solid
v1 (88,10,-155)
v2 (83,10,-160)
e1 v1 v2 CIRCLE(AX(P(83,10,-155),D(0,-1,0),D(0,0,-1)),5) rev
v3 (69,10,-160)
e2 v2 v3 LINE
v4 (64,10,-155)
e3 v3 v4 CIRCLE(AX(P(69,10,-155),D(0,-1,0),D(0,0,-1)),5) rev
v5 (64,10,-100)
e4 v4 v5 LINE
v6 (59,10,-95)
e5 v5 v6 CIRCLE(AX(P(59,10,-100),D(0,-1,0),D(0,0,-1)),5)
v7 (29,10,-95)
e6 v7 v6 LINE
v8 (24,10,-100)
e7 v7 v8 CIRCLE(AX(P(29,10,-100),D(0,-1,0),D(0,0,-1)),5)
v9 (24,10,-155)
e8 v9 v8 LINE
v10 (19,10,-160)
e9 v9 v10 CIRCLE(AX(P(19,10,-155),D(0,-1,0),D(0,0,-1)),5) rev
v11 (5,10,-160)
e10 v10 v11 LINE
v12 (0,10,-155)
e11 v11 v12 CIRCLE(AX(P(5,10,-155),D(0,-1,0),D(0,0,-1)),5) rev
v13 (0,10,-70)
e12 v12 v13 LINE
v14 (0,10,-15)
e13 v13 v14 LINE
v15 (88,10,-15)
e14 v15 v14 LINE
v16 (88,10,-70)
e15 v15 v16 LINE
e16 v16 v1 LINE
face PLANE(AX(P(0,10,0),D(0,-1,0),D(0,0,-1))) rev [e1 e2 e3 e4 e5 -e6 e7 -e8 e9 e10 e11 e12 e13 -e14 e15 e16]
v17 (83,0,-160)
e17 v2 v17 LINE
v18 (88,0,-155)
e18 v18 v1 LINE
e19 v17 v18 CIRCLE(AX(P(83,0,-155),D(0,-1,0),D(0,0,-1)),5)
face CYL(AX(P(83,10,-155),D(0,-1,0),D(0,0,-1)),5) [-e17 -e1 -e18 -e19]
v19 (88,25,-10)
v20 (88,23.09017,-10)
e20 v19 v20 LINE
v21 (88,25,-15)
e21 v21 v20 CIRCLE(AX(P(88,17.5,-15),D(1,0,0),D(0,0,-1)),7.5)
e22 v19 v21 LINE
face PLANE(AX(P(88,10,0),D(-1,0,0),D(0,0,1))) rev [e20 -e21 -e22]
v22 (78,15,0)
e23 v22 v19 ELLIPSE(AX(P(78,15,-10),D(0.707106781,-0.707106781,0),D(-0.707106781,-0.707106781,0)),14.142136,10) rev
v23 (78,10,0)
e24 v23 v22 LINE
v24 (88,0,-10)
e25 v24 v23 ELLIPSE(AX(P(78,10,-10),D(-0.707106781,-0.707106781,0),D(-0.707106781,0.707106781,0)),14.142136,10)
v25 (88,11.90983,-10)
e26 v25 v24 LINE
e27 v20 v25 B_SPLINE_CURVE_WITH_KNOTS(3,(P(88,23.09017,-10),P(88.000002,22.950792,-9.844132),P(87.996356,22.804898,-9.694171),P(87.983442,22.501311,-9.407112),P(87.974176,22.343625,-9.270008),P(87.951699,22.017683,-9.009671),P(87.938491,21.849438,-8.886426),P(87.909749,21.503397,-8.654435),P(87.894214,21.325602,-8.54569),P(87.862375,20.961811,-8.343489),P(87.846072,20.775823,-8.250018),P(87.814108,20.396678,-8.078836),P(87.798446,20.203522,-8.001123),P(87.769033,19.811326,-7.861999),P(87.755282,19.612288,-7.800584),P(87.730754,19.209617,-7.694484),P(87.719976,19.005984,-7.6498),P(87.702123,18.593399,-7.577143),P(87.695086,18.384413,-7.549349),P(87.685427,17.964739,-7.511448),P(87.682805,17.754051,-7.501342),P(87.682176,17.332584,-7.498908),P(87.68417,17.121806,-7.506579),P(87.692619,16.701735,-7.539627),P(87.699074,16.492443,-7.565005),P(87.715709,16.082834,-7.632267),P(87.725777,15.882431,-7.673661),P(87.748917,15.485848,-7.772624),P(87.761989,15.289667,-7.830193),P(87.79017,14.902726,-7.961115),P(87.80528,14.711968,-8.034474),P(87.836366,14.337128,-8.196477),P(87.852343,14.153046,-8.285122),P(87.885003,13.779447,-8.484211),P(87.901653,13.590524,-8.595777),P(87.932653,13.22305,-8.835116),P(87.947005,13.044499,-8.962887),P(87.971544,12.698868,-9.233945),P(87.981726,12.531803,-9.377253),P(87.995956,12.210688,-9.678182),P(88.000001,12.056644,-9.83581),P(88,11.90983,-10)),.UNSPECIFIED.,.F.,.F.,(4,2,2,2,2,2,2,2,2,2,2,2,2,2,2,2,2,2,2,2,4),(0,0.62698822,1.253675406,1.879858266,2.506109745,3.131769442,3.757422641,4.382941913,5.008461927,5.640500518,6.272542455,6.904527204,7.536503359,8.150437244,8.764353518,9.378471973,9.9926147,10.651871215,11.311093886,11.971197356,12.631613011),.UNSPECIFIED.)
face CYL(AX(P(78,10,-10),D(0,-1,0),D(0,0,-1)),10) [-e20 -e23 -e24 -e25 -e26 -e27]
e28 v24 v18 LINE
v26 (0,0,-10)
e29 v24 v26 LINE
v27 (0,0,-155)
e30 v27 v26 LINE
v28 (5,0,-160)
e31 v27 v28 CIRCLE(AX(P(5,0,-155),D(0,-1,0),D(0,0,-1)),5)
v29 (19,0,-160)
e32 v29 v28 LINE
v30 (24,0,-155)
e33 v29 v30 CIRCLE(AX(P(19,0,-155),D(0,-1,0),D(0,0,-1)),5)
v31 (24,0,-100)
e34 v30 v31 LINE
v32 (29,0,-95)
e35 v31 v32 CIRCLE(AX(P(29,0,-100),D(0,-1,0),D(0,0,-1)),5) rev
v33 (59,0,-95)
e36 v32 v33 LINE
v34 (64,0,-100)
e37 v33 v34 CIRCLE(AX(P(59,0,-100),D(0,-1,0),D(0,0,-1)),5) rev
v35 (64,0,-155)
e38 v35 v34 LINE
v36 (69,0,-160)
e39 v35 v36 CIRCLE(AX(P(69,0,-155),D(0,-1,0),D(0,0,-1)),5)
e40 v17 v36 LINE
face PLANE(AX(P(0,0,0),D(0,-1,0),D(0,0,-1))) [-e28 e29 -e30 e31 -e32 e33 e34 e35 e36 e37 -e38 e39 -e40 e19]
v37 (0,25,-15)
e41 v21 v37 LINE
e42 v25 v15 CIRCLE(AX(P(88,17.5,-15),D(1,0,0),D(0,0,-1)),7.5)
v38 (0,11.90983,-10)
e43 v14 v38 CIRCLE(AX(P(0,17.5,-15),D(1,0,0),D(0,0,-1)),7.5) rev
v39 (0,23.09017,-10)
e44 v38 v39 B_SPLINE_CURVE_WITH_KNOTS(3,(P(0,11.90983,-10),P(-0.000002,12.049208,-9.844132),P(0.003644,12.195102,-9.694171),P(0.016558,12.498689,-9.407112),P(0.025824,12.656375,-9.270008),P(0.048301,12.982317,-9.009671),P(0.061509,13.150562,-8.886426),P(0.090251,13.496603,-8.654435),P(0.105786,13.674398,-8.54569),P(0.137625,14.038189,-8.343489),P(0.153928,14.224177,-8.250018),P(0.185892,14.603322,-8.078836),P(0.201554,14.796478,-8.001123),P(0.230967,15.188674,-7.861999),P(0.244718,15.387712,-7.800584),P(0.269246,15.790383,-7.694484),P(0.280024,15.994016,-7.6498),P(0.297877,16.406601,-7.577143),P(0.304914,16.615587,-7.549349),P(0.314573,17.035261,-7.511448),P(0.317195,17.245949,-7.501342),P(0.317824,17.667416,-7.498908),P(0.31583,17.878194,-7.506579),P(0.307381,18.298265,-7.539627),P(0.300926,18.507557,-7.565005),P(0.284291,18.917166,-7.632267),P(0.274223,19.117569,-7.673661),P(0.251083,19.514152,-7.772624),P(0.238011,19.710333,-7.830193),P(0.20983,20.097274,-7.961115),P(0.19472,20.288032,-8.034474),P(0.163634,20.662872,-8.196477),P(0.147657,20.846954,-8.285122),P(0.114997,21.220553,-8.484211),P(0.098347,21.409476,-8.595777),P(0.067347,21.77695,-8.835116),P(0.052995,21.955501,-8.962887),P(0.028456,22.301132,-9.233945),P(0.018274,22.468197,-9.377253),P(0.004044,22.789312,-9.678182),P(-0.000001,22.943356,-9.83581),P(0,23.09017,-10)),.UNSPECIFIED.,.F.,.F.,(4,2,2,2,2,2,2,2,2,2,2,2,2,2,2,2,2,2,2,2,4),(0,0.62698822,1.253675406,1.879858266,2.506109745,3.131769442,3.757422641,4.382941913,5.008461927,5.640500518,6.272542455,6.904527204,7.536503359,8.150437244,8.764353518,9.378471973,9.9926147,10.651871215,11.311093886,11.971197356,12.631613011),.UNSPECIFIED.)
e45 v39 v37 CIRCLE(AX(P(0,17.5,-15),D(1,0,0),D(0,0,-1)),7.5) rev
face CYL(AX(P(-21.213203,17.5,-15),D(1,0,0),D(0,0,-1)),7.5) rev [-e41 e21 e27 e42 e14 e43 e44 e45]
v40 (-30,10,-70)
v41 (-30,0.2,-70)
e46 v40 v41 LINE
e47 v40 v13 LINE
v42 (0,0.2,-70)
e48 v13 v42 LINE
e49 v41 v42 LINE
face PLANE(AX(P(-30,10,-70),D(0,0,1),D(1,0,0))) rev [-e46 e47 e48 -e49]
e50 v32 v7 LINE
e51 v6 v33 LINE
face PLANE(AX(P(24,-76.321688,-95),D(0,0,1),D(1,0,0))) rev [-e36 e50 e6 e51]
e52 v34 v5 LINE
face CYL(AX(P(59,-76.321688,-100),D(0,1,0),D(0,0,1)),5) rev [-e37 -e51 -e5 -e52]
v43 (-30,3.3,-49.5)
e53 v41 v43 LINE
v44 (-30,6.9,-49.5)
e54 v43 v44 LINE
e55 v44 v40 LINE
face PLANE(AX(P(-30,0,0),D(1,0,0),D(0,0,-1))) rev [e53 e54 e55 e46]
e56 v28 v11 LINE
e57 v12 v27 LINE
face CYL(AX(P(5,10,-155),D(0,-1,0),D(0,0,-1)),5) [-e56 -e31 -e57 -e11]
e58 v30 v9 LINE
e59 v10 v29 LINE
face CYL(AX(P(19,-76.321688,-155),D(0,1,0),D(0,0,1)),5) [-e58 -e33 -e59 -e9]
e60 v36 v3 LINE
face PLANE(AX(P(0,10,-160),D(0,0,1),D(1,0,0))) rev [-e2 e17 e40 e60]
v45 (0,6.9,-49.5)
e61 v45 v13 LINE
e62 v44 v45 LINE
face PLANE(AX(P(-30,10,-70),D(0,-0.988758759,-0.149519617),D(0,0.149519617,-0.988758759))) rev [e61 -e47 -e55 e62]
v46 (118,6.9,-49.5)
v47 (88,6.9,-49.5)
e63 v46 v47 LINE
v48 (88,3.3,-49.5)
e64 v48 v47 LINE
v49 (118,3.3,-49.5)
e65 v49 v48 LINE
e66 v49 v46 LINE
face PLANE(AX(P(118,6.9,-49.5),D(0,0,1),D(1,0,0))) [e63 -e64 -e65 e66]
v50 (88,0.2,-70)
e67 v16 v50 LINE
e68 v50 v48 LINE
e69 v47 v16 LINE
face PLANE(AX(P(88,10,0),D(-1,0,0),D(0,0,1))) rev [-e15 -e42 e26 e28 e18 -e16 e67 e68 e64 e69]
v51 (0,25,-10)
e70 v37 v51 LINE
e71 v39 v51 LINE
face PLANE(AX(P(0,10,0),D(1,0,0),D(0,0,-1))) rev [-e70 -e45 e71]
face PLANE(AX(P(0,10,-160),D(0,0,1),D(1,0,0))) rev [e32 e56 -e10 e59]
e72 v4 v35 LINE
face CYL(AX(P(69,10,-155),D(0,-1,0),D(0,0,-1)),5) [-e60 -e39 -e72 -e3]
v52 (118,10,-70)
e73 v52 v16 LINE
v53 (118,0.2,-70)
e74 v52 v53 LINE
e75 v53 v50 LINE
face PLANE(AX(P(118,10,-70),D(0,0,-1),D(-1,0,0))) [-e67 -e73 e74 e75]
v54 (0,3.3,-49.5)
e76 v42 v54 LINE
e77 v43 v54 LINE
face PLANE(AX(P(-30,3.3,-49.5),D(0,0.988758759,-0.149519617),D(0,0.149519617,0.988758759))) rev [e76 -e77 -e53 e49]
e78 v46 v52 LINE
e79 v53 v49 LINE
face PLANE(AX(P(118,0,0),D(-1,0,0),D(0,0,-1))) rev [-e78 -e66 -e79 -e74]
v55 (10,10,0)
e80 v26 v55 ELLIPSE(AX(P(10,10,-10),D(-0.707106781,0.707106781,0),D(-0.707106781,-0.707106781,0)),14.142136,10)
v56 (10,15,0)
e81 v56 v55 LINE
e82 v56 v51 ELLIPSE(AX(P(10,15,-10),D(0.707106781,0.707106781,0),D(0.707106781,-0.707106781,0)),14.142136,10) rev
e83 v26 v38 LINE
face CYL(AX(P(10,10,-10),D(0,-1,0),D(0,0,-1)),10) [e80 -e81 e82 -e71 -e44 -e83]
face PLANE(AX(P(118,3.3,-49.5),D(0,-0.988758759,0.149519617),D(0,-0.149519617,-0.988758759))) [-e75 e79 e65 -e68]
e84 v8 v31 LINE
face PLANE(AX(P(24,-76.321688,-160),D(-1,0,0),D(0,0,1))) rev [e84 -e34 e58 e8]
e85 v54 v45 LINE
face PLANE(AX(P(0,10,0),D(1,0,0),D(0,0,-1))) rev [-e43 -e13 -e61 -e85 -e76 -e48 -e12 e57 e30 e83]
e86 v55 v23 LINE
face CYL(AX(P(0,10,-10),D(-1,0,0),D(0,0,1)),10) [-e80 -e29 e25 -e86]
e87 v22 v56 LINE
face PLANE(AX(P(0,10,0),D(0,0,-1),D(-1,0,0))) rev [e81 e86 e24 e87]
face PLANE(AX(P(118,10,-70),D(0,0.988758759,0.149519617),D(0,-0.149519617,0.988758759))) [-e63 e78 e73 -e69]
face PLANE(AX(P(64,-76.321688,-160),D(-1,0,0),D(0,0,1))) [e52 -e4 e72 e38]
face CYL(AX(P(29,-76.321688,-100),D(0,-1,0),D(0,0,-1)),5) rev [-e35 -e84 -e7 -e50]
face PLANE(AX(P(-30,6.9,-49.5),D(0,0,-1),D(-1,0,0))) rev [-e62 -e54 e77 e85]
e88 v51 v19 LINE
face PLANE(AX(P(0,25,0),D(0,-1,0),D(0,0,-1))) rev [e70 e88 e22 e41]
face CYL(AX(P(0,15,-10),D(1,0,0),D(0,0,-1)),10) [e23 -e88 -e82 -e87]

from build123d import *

# Parameters (mm, degrees)
SKETCH1_W           = 88
SKETCH1_H           = 160
BOSS_EXTRUDE1_DEPTH = 10
SKETCH2_W           = 88
SKETCH2_H           = 15
BOSS_EXTRUDE2_DEPTH = 15
SKETCH3_R           = 7.5
CUT_EXTRUDE1_DEPTH  = 88
FILLET1_R           = 10
SKETCH4_W           = 40
SKETCH4_H           = 65
CUT_EXTRUDE2_DEPTH  = 10
FILLET2_R           = 5
FILLET3_R           = 5
BOSS_EXTRUDE4_DEPTH = 30


with BuildPart() as part:
    # Sketch1 → Boss-Extrude1 (new body)
    with BuildSketch(Plane(origin=(0, 0, 0), x_dir=(1, 0, 0), z_dir=(0, 1, 0))):
        with Locations((44, 80)):
            Rectangle(SKETCH1_W, SKETCH1_H)
    extrude(amount=BOSS_EXTRUDE1_DEPTH)

    # Sketch2 → Boss-Extrude2 (add)
    with BuildSketch(Plane(origin=(0, 10, 0), x_dir=(1, 0, 0), z_dir=(0, 1, 0))):
        with Locations((44, 7.5)):
            Rectangle(SKETCH2_W, SKETCH2_H)
    extrude(amount=BOSS_EXTRUDE2_DEPTH)

    # Sketch3 → Cut-Extrude1 (cut)
    with BuildSketch(Plane(origin=(88, 0, 0), x_dir=(0, 0, -1), z_dir=(1, 0, 0))):
        with Locations((15, 17.5)):
            Circle(SKETCH3_R)
    extrude(amount=-CUT_EXTRUDE1_DEPTH, mode=Mode.SUBTRACT)

    # Fillet1
    # the kernel refuses this fillet: 10 mm, written as the material it takes off along each edge
    with BuildSketch(Plane(origin=(-25, 25, 0), x_dir=(0, -1, 0), z_dir=(1, 0, 0))) as fillet1_piece_1:
        with BuildLine():
            CenterArc((FILLET1_R, FILLET1_R), FILLET1_R, 180, 90)
            Line((0, FILLET1_R), (0, 0))
            Line((0, 0), (FILLET1_R, 0))
        make_face()
    extrude(amount=138, mode=Mode.SUBTRACT)
    with BuildSketch(Plane(origin=(-25, 0, 0), x_dir=(0, 1, 0), z_dir=(1, 0, 0))) as fillet1_piece_2:
        with BuildLine():
            CenterArc((FILLET1_R, -FILLET1_R), FILLET1_R, 90, 90)
            Line((0, -FILLET1_R), (0, 0))
            Line((0, 0), (FILLET1_R, 0))
        make_face()
    extrude(amount=138, mode=Mode.SUBTRACT)
    with BuildSketch(Plane(origin=(88, -25, 0), x_dir=(-1, 0, 0), z_dir=(0, 1, 0)), Plane(origin=(0, 50, 0), x_dir=(1, 0, 0), z_dir=(0, -1, 0))) as fillet1_piece_3:
        with BuildLine():
            CenterArc((FILLET1_R, -FILLET1_R), FILLET1_R, 90, 90)
            Line((0, -FILLET1_R), (0, 0))
            Line((0, 0), (FILLET1_R, 0))
        make_face()
    extrude(amount=75, mode=Mode.SUBTRACT)

    # Sketch4 → Cut-Extrude2 (cut)
    with BuildSketch(Plane(origin=(0, 10, 0), x_dir=(1, 0, 0), z_dir=(0, 1, 0))):
        with Locations((44, 127.5)):
            Rectangle(SKETCH4_W, SKETCH4_H)
    extrude(amount=-CUT_EXTRUDE2_DEPTH, mode=Mode.SUBTRACT)

    # Fillet2
    fillet2_edges = [part.edges().sort_by_distance(p)[0] for p in [
        (64, 5, -95),
        (24, 5, -95),
        (24, 5, -160),
        (64, 5, -160),
    ]]
    fillet(fillet2_edges, radius=FILLET2_R)

    # Fillet3
    fillet3_edges = [part.edges().sort_by_distance(p)[0] for p in [
        (0, 5, -160),
        (88, 5, -160),
    ]]
    fillet(fillet3_edges, radius=FILLET3_R)

    # Sketch5 → Boss-Extrude4 (add)
    with BuildSketch(Plane.ZY):
        Polygon((-70, 10), (-70, 0.2), (-49.5, 3.3), (-49.5, 6.9), align=None)
    boss_extrude4 = extrude(amount=BOSS_EXTRUDE4_DEPTH)

    # Mirror1: Boss-Extrude4 across plane
    add(boss_extrude4.mirror(Plane(origin=(44, 0, 0), x_dir=(0, 0, 1), z_dir=(1, 0, 0))))


solid = part.part
